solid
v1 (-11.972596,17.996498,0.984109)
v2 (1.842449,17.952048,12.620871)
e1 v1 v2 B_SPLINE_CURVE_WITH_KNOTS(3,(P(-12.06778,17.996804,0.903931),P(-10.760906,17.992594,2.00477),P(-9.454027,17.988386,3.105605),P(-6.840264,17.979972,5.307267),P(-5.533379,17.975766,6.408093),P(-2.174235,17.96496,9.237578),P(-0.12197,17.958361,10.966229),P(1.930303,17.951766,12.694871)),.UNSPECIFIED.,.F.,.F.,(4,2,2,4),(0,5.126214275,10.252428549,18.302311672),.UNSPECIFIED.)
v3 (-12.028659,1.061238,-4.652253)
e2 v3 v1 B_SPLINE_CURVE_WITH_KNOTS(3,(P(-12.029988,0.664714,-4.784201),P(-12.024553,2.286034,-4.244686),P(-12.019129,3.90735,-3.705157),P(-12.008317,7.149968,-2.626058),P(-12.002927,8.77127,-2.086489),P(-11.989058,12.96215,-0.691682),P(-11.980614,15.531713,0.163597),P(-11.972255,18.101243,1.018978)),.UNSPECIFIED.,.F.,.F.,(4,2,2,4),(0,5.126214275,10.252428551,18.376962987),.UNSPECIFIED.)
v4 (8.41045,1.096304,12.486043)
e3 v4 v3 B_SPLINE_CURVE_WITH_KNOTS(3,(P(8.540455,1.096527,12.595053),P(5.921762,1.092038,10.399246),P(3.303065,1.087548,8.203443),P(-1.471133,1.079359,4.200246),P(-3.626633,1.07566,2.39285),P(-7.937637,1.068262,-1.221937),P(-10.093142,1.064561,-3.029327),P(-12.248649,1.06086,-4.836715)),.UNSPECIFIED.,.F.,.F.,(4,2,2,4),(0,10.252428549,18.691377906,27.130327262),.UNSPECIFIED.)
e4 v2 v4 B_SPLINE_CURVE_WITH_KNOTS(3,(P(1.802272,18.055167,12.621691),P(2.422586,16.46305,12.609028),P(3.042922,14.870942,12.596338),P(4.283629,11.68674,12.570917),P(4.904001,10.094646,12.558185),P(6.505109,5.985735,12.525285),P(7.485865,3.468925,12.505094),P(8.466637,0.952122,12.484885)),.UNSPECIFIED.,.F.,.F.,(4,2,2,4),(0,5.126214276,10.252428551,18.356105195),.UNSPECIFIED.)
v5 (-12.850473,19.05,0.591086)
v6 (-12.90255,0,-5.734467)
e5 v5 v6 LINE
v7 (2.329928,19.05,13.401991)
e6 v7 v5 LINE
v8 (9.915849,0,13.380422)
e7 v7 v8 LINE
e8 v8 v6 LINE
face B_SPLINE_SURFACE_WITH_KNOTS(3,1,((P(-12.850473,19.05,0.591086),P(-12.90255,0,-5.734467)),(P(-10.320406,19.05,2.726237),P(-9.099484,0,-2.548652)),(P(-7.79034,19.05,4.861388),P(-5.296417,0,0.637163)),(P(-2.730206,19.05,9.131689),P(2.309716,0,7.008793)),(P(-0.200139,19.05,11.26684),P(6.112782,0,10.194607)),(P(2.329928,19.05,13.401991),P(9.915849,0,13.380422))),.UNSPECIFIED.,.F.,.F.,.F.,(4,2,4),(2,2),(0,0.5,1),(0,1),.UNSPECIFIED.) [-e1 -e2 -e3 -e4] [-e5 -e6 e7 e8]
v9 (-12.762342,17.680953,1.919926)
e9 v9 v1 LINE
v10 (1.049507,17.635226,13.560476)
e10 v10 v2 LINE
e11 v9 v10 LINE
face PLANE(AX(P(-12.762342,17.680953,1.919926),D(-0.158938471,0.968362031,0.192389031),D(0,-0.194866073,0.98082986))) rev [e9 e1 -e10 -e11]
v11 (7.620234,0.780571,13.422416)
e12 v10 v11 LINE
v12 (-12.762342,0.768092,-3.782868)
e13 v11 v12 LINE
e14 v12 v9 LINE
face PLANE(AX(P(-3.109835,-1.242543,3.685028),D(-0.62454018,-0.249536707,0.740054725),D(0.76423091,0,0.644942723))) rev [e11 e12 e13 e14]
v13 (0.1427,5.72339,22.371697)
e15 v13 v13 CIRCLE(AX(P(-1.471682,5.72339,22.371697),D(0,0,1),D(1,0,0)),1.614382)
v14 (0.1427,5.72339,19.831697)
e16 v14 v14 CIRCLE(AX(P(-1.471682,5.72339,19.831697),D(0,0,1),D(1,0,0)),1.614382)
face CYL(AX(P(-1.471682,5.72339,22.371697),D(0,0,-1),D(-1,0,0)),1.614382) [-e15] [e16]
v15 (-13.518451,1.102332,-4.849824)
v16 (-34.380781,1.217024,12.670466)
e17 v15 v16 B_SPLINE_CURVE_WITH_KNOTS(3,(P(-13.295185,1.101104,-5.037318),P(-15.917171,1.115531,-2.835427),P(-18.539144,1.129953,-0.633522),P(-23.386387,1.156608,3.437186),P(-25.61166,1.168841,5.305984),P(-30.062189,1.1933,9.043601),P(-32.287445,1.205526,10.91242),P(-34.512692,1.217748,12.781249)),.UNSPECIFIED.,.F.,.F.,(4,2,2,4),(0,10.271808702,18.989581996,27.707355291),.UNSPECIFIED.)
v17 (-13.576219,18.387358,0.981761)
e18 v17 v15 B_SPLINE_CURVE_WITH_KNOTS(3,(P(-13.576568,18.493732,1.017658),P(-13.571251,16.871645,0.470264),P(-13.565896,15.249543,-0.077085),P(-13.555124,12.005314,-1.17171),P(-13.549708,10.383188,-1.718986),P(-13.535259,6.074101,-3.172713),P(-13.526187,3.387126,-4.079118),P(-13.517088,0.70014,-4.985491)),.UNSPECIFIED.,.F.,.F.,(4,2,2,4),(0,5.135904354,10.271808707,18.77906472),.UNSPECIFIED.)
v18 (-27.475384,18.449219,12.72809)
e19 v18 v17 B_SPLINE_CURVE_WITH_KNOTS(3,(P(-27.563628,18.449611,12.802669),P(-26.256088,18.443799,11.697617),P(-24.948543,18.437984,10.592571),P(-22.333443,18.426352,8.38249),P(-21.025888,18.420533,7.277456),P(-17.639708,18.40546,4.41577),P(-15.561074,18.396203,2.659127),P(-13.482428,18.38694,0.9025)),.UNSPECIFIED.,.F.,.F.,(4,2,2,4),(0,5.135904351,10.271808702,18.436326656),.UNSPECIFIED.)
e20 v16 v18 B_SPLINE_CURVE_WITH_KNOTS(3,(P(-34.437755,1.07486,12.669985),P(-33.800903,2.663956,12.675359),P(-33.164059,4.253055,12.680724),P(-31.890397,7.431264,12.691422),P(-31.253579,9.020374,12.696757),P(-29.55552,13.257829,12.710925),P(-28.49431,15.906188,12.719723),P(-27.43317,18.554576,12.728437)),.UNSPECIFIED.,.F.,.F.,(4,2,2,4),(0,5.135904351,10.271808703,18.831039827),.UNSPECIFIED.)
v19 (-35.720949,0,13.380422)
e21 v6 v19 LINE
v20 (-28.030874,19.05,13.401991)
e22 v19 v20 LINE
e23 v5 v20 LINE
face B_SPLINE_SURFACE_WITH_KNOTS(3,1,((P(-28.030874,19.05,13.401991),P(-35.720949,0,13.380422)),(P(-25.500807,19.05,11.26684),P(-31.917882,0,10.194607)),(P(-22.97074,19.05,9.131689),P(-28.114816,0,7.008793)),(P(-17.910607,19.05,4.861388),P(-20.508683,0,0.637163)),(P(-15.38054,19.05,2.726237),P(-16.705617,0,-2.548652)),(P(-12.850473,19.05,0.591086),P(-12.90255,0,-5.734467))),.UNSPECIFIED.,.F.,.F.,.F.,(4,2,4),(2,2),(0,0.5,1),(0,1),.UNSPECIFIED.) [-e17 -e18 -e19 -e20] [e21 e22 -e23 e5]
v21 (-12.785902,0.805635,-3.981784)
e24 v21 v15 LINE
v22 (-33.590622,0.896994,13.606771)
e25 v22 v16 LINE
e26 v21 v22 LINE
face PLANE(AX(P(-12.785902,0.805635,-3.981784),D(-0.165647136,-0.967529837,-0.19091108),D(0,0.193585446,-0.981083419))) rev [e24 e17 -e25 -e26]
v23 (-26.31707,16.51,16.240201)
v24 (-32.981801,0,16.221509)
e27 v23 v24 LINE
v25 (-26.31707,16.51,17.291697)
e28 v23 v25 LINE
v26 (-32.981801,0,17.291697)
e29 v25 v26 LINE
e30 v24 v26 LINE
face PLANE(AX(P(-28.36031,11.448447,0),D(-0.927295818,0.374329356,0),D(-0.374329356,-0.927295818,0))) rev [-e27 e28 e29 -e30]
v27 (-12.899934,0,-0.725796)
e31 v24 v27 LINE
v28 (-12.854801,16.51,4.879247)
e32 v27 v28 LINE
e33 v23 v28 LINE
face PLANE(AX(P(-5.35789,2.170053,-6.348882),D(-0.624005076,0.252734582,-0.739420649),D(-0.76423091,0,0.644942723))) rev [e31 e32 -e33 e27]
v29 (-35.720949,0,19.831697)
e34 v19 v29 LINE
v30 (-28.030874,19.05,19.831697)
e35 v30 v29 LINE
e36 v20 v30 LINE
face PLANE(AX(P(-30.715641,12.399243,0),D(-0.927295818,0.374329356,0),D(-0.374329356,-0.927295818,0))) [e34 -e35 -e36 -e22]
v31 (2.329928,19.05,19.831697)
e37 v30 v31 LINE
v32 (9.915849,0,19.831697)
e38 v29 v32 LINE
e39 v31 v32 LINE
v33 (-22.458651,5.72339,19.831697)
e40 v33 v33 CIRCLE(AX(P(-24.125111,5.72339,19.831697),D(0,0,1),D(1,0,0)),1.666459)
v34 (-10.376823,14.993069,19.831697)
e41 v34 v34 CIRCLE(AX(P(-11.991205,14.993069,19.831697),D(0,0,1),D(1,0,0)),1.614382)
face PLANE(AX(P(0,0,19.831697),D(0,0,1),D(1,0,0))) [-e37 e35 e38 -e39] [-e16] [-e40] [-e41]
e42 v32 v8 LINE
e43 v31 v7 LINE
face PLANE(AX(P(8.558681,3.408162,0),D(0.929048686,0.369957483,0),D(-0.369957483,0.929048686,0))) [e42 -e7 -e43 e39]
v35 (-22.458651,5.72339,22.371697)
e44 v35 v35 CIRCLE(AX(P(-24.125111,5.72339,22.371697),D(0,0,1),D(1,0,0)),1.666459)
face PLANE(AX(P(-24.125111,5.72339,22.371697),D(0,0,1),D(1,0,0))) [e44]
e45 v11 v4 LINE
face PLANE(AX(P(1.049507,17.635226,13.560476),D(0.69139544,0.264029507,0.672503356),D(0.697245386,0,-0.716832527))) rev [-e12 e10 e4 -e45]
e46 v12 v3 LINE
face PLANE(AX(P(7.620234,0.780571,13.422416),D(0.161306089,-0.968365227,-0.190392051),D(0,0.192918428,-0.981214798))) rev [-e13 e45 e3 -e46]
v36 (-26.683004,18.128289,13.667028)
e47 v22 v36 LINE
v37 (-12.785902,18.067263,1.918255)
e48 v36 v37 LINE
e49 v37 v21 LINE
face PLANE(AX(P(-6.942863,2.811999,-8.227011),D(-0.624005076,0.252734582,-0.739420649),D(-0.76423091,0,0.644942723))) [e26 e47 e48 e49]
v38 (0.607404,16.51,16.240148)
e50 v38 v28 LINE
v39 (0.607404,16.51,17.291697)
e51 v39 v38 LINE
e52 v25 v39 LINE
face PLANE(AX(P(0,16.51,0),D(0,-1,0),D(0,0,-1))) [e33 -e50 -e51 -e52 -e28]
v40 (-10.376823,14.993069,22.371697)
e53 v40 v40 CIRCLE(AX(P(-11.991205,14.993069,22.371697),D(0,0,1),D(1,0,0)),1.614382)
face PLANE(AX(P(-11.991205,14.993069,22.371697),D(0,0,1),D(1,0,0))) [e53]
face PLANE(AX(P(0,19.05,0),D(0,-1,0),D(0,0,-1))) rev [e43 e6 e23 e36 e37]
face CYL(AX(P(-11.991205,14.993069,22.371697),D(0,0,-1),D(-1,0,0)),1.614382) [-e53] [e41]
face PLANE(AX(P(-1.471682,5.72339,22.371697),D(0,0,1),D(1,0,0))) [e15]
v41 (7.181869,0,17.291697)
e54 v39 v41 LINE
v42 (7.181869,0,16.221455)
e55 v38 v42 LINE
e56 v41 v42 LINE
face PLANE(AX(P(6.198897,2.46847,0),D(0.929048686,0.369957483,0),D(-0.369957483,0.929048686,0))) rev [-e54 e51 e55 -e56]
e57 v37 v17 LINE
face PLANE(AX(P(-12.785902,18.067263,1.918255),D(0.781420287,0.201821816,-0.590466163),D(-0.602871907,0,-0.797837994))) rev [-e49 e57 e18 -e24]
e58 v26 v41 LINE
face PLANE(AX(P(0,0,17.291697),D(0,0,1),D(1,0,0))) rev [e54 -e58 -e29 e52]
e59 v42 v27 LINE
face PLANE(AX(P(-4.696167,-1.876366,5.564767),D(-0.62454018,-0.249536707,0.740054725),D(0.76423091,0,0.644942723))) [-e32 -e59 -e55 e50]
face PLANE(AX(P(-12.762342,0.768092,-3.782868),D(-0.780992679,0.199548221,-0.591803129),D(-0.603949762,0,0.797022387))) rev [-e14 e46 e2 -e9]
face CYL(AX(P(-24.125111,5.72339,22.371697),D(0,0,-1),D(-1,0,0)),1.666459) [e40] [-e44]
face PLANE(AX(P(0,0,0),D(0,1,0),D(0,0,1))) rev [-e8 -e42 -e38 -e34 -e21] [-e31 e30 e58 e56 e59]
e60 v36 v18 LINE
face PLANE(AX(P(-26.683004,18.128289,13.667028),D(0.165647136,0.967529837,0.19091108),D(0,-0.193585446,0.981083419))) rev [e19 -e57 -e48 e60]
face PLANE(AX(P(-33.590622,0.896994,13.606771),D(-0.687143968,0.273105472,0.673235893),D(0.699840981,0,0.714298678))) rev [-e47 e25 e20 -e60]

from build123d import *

# Parameters (mm, degrees)
SKETCH8_R           = 1.614382249
SKETCH8_R_2         = 1.666459096
BOSS_EXTRUDE1_DEPTH = 2.54
CUT_EXTRUDE1_DEPTH  = 1.27
CUT_EXTRUDE3_DEPTH  = 1.27


with BuildPart() as part:
    # Sketch7 → Loft1 section 0
    with BuildSketch(Plane(origin=(0, 19.05, 0), x_dir=(1, 0, 0), z_dir=(0, 1, 0))):
        with BuildLine():
            Line((2.329927564, -19.831697395), (-28.030874095, -19.831697395))
            Line((-28.030874095, -19.831697395), (-28.030874095, -13.401990643))
            Line((-28.030874095, -13.401990643), (-12.850473266, -0.591086342))
            Line((-12.850473266, -0.591086342), (2.329927564, -13.401990643))
            Line((2.329927564, -13.401990643), (2.329927564, -19.831697395))
        make_face()
    # Sketch1 → Loft1 section 1
    with BuildSketch(Plane(origin=(0, 0, 0), x_dir=(1, 0, 0), z_dir=(0, 1, 0))):
        with BuildLine():
            Line((-35.720948922, -19.831697395), (9.915848697, -19.831697395))
            Line((9.915848697, -19.831697395), (9.915848697, -13.380422339))
            Line((9.915848697, -13.380422339), (-12.902550112, 5.734466717))
            Line((-12.902550112, 5.734466717), (-35.720948922, -13.380422339))
            Line((-35.720948922, -13.380422339), (-35.720948922, -19.831697395))
        make_face()
    loft()

    # Sketch8 → Boss-Extrude1 (add)
    with BuildSketch(Plane.XY.offset(19.831697395)):
        with Locations((-11.991205294, 14.993068909)):
            Circle(SKETCH8_R)
        with Locations((-1.47168225, 5.723390187)):
            Circle(SKETCH8_R)
        with Locations((-24.125110588, 5.723390187)):
            Circle(SKETCH8_R_2)
    extrude(amount=BOSS_EXTRUDE1_DEPTH)

    # Sketch10 → Cut-Extrude1 (cut)
    with BuildSketch(Plane(origin=(-2.316668622, -0.925631174, 2.745158144), x_dir=(-0.7809926786782739, 0.19954822136443426, -0.5918031287524808), z_dir=(0.6245401795328581, 0.2495367072226862, -0.7400547249342612))):
        Polygon((-5.325710862, 21.043562966), (-13.739013708, 5.028281727), (12.35928027, -0.480841902), (12.35928027, 17.367594826), align=None)
    extrude(amount=-CUT_EXTRUDE1_DEPTH, mode=Mode.SUBTRACT)

    # Sketch14 → Cut-Extrude3 (cut)
    with BuildSketch(Plane(origin=(-7.735349681, 3.132971893, -9.166074927), x_dir=(-0.7814202870497631, -0.2018218164714577, 0.5904661627758421), z_dir=(-0.6240050760907847, 0.25273458150056255, -0.7394206491075764))):
        Polygon((34.101698791, 5.249617187), (25.261874217, 21.574256729), (7.477459861, 17.716608027), (7.477459861, -0.525493463), align=None)
    extrude(amount=-CUT_EXTRUDE3_DEPTH, mode=Mode.SUBTRACT)

    # Shell1: read off the stored shape, not the designer's step
    # Shell1: loft between two sections, ruled curve by curve
    shell1_from = [
        Edge.make_line((-32.981801445, 0, 17.291697395), (-32.981801445, 0, 16.221508901)),
        Edge.make_line((7.181869263, 0, 16.221455471), (7.181869263, 0, 17.291697395)),
        Edge.make_line((-32.981801445, 0, 17.291697395), (7.181869263, 0, 17.291697395)),
        Edge.make_line((7.181869263, 0, 16.221455471), (-12.899934435, 0, -0.725795677)),
        Edge.make_line((-32.981801445, 0, 16.221508901), (-12.899934435, 0, -0.725795677)),
    ]
    shell1_to = [
        Edge.make_line((-26.317069927, 16.51, 17.291697395), (-26.317069927, 16.51, 16.240201431)),
        Edge.make_line((0.607404281, 16.51, 16.240148002), (0.607404281, 16.51, 17.291697395)),
        Edge.make_line((-26.317069927, 16.51, 17.291697395), (0.607404281, 16.51, 17.291697395)),
        Edge.make_line((0.607404281, 16.51, 16.240148002), (-12.854801168, 16.51, 4.879247349)),
        Edge.make_line((-26.317069927, 16.51, 16.240201431), (-12.854801168, 16.51, 4.879247349)),
    ]
    shell1 = Solid(Shell([*[Face.make_surface_from_curves(shell1_from[k], shell1_to[k]) for k in range(5)], Face(Wire(shell1_from)), Face(Wire(shell1_to))]))
    add(shell1, mode=Mode.SUBTRACT)


solid = part.part
